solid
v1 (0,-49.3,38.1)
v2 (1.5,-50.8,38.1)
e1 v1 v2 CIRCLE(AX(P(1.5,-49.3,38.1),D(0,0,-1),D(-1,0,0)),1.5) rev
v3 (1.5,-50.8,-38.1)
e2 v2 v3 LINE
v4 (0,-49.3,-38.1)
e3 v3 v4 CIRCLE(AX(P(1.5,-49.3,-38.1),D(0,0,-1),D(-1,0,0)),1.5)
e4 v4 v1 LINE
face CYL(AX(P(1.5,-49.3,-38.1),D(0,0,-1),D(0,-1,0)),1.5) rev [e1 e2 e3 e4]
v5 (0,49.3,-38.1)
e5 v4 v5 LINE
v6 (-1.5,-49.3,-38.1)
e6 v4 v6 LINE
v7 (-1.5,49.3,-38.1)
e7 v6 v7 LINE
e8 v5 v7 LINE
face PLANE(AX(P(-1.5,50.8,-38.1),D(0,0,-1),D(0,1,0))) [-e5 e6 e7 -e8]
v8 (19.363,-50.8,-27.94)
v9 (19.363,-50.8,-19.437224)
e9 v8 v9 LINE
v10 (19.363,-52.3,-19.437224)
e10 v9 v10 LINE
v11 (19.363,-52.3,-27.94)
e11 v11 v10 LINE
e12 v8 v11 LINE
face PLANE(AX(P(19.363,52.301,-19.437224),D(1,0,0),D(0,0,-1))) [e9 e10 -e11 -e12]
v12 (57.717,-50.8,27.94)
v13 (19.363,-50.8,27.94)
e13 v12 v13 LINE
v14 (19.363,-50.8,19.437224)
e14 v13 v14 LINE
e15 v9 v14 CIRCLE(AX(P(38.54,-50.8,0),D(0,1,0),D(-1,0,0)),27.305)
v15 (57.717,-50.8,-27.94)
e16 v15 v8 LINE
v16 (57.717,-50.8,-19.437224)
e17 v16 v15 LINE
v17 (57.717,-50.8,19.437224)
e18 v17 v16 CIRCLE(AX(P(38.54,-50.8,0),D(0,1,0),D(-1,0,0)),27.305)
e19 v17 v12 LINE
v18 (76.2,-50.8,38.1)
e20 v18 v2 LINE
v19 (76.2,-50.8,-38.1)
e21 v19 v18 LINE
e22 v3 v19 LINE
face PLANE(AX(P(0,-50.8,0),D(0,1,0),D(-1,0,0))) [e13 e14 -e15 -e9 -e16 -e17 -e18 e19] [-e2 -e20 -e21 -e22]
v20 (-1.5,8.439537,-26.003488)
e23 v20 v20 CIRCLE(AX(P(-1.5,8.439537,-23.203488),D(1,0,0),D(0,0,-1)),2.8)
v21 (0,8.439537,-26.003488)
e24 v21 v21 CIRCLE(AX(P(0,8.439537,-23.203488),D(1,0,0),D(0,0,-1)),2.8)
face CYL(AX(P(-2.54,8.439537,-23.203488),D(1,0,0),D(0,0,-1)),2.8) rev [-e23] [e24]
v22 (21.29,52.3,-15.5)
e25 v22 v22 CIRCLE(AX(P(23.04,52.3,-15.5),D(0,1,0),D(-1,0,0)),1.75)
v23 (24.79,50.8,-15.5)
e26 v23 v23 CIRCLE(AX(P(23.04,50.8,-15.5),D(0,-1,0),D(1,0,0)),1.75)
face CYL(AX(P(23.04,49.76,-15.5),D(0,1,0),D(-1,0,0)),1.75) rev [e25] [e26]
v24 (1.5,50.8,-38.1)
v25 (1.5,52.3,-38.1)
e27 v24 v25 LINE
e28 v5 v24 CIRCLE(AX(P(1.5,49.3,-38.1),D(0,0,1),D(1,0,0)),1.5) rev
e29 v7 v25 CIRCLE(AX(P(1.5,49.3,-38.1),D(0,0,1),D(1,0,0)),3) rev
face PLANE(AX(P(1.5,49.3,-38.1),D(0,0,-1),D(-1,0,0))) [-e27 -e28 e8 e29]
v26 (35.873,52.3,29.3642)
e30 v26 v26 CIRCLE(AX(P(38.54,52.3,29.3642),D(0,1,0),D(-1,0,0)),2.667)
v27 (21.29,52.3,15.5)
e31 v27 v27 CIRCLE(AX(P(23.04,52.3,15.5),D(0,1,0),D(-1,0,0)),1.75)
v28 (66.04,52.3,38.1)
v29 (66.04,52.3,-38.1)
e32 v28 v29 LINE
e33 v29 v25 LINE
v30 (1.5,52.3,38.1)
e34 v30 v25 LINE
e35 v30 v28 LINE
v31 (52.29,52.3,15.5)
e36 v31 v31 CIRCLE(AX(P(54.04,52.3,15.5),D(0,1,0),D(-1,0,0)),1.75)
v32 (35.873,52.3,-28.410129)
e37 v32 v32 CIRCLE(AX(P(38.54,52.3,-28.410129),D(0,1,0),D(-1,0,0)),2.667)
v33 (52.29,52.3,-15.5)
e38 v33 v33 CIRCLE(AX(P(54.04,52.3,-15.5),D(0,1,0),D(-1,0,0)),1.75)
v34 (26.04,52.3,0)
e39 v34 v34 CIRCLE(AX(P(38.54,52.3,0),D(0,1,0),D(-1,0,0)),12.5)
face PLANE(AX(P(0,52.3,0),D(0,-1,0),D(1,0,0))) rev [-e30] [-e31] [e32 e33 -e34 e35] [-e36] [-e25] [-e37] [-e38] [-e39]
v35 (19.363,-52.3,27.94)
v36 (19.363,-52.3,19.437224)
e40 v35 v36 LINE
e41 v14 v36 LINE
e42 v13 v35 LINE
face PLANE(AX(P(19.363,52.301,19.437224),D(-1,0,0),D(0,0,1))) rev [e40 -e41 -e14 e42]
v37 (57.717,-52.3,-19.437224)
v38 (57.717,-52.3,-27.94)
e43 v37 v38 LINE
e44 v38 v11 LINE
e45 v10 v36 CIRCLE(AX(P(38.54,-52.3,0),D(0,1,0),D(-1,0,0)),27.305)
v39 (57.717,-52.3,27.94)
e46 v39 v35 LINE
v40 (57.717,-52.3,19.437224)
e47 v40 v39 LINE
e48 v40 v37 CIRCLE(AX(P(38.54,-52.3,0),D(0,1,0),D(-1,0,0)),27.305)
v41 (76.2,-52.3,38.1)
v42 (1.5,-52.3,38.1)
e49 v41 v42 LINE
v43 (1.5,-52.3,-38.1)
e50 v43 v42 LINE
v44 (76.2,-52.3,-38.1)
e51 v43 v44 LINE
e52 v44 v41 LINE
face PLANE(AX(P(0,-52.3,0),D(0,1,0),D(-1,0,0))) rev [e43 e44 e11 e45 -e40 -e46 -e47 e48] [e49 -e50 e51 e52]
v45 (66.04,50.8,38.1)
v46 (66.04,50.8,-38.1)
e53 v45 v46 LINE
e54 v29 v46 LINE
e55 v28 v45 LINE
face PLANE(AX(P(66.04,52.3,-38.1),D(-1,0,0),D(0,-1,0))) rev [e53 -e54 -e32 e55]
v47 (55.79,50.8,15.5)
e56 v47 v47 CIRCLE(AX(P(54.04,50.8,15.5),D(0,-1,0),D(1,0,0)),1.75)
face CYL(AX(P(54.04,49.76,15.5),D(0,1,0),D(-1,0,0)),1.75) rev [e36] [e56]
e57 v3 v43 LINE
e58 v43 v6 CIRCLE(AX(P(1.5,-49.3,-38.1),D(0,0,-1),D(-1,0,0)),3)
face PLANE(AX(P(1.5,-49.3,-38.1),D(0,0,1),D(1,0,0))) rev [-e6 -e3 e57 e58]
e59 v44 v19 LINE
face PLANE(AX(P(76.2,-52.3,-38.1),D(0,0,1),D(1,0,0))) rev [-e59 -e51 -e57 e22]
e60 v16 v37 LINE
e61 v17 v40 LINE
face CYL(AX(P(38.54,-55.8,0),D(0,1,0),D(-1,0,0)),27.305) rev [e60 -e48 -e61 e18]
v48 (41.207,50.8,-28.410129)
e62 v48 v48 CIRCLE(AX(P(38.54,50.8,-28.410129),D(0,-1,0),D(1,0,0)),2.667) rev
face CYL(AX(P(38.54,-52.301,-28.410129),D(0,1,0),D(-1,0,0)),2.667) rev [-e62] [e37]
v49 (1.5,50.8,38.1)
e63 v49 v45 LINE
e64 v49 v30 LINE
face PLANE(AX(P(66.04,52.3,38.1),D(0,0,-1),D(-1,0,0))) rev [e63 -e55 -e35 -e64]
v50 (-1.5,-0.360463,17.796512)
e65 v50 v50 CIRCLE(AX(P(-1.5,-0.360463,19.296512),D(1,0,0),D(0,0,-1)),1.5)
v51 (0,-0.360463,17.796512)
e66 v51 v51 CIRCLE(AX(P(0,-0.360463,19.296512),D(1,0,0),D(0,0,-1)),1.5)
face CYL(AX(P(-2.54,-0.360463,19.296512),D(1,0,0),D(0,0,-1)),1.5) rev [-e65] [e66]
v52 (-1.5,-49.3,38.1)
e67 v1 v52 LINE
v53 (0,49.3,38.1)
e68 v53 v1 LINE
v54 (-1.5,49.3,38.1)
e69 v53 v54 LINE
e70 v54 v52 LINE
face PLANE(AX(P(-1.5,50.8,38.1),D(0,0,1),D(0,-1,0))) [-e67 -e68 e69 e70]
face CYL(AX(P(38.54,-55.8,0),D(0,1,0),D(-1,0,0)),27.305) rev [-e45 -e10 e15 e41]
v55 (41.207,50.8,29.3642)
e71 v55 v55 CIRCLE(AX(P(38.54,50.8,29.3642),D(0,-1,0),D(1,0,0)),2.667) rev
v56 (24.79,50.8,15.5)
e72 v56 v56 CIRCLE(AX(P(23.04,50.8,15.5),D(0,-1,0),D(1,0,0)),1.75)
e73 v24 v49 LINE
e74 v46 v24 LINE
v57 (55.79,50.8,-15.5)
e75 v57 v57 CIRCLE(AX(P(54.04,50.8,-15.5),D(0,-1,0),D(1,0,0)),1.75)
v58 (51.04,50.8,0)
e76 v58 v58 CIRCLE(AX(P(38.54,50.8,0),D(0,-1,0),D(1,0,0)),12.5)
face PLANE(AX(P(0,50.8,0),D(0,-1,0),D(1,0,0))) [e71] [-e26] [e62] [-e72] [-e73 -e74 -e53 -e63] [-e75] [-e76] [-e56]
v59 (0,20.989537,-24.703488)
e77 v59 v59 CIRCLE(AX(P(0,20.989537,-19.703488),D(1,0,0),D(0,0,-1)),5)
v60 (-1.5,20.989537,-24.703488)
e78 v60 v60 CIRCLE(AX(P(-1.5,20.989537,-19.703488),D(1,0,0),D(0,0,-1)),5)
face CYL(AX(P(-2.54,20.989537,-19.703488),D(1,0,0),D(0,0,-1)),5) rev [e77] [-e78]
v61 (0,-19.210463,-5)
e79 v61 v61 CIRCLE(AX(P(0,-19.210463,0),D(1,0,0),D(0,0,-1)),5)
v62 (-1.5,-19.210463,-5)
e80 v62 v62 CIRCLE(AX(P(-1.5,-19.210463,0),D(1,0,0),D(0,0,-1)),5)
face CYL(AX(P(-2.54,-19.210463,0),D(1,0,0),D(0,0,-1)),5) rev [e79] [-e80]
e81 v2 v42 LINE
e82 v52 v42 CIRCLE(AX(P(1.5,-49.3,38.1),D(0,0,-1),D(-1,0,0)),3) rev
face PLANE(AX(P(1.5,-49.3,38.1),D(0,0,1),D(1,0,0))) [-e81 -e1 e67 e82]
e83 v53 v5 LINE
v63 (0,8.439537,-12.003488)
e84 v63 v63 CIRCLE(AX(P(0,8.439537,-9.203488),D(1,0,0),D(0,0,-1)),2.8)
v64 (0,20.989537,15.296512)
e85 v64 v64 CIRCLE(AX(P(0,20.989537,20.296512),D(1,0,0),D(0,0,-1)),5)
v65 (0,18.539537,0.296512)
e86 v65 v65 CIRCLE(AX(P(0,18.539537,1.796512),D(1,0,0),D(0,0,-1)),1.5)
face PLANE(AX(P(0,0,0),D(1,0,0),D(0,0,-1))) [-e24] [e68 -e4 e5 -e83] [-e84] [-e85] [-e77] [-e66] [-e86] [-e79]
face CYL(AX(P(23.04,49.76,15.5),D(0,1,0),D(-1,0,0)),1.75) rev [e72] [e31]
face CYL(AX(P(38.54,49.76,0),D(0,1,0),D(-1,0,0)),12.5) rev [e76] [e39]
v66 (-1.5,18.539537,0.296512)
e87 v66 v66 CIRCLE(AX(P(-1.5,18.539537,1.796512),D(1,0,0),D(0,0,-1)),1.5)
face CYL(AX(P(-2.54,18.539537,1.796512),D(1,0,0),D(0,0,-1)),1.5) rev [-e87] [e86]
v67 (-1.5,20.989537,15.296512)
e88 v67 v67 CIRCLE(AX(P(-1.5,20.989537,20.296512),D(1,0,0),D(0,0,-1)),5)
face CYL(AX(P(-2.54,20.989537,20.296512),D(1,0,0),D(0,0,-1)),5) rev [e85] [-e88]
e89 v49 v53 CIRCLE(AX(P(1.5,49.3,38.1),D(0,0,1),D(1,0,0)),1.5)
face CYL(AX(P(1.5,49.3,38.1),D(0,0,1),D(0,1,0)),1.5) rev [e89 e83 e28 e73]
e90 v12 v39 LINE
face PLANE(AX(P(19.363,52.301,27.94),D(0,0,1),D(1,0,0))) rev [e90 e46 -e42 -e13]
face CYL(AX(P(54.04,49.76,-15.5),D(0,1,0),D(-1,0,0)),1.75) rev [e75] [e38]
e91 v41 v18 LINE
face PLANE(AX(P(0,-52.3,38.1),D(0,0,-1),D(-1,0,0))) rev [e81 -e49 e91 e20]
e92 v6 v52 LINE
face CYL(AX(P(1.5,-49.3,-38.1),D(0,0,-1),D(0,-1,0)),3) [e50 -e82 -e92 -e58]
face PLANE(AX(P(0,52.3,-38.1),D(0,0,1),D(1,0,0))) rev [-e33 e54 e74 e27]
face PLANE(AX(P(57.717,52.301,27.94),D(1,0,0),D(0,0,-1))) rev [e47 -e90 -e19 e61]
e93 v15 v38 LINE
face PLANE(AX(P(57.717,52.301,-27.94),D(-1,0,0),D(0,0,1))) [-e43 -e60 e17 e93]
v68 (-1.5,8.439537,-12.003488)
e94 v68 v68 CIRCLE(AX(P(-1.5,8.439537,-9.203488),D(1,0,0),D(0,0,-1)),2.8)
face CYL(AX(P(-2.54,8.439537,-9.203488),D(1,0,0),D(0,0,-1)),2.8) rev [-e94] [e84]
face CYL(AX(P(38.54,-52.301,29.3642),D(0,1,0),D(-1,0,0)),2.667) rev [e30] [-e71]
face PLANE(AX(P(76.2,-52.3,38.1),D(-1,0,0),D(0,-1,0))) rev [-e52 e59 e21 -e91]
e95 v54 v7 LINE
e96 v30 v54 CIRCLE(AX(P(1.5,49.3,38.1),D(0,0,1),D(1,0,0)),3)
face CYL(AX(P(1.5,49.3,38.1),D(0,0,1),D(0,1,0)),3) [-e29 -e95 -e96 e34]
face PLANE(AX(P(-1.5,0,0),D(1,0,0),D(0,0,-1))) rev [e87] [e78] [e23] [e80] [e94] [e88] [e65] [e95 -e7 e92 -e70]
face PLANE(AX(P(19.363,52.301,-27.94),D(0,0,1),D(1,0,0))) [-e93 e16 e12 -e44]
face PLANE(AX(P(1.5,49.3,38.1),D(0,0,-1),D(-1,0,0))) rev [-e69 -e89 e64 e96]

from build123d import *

# Parameters (mm, degrees)
SKETCH63_W                     = 76.2
SKETCH63_H                     = 101.6
BRACKET_INTERFACE_DEPTH        = 1.5
SKETCH57_R                     = 2.8
SKETCH57_R_2                   = 1.5
SKETCH57_R_3                   = 5
CUT_EXTRUDE7_DEPTH             = 2.54
STEPPER_FLANGE_STRIP_W         = 9
STEPPER_FLANGE_STRIP_H         = 1.5
STEPPER_FLANGE_STRIP_CUT_DEPTH = 76.2
STEPPER_FLANGE_DEPTH           = 76.2
BARREL_FLANGE_STRIP_W          = 9
BARREL_FLANGE_STRIP_H          = 1.5
BARREL_FLANGE_STRIP_CUT_DEPTH  = 76.2
BARREL_FLANGE_DEPTH            = 76.2
SKETCH75_R                     = 1.75
SKETCH75_R_2                   = 12.5
NEMA_17_PATTERN_DEPTH          = 2.54
SKETCH82_R                     = 27.305
CUT_EXTRUDE8_DEPTH             = 5
CUT_EXTRUDE17_REACH            = 136.904
CUT_EXTRUDE18_REACH            = 136.904
SKETCH145_R                    = 2.667


# Sheet-metal steps are written as plain solids
with BuildPart() as part:
    # Sketch63 → Bracket_Interface (new body)
    with BuildSketch(Plane(origin=(0, 0, 0), x_dir=(0, 0, -1), z_dir=(1, 0, 0))):
        Rectangle(SKETCH63_W, SKETCH63_H)
    extrude(amount=-BRACKET_INTERFACE_DEPTH)

    # Sketch57 → Cut-Extrude7 (cut)
    # profile 1 of 7: a face of its own
    with BuildSketch(Plane(origin=(0, 0, 0), x_dir=(0, 0, -1), z_dir=(1, 0, 0))):
        with Locations((9.203487694, 8.439536918)):
            Circle(SKETCH57_R)
        with Locations((9.203487694, 8.439536918)):
            Circle(SKETCH57_R_2, mode=Mode.SUBTRACT)
    # profile 2 of 7: a face of its own
    with BuildSketch(Plane(origin=(0, 0, 0), x_dir=(0, 0, -1), z_dir=(1, 0, 0))):
        with Locations((23.203487694, 8.439536918)):
            Circle(SKETCH57_R)
        with Locations((23.203487694, 8.439536918)):
            Circle(SKETCH57_R_2, mode=Mode.SUBTRACT)
    # profile 3 of 7: a face of its own
    with BuildSketch(Plane(origin=(0, 0, 0), x_dir=(0, 0, -1), z_dir=(1, 0, 0))):
        with Locations((0, -19.210463082)):
            Circle(SKETCH57_R_3)
    # profile 4 of 7: a face of its own
    with BuildSketch(Plane(origin=(0, 0, 0), x_dir=(0, 0, -1), z_dir=(1, 0, 0))):
        with Locations((-19.296512306, -0.360463082)):
            Circle(SKETCH57_R_2)
    # profile 5 of 7: a face of its own
    with BuildSketch(Plane(origin=(0, 0, 0), x_dir=(0, 0, -1), z_dir=(1, 0, 0))):
        with Locations((-1.796512306, 18.539536918)):
            Circle(SKETCH57_R_2)
    # profile 6 of 7: a face of its own
    with BuildSketch(Plane(origin=(0, 0, 0), x_dir=(0, 0, -1), z_dir=(1, 0, 0))):
        with Locations((19.703487694, 20.989536918)):
            Circle(SKETCH57_R_3)
    # profile 7 of 7: a face of its own
    with BuildSketch(Plane(origin=(0, 0, 0), x_dir=(0, 0, -1), z_dir=(1, 0, 0))):
        with Locations((-20.296512306, 20.989536918)):
            Circle(SKETCH57_R_3)
    extrude(amount=-CUT_EXTRUDE7_DEPTH, mode=Mode.SUBTRACT)


with BuildPart() as body_2:
    # of the pieces the cut leaves, the one that is kept (cut_extrude7_keep)
    add(part.part.solids().sort_by_distance((0, 50.8, 38.1))[0])

    # Stepper_Flange strip (across the edge) → Stepper_Flange strip cut (cut)
    with BuildSketch(Plane(origin=(0, 50.8, -38.1), x_dir=(0, -1, 0), z_dir=(0, 0, 1))):
        with Locations((-3, -0.75)):
            Rectangle(STEPPER_FLANGE_STRIP_W, STEPPER_FLANGE_STRIP_H)
    extrude(amount=STEPPER_FLANGE_STRIP_CUT_DEPTH, mode=Mode.SUBTRACT)

    # Stepper_Flange section (across the edge) → Stepper_Flange (add)
    with BuildSketch(Plane(origin=(0, 50.8, -38.1), x_dir=(0, -1, 0), z_dir=(0, 0, 1))):
        with BuildLine():
            Line((-1.5, 1.5), (-1.5, 66.04))
            Line((-1.5, 66.04), (0, 66.04))
            Line((0, 66.04), (0, 1.5))
            ThreePointArc((0, 1.5), (0.439339828, 0.439339828), (1.5, 0))
            Line((1.5, 0), (1.5, -1.5))
            ThreePointArc((1.5, -1.5), (-0.621320344, -0.621320344), (-1.5, 1.5))
        make_face()
    extrude(amount=STEPPER_FLANGE_DEPTH)

    # Barrel_Flange strip (across the edge) → Barrel_Flange strip cut (cut)
    with BuildSketch(Plane(origin=(0, -50.8, 38.1), x_dir=(0, 1, 0), z_dir=(0, 0, -1))):
        with Locations((-3, -0.75)):
            Rectangle(BARREL_FLANGE_STRIP_W, BARREL_FLANGE_STRIP_H)
    extrude(amount=BARREL_FLANGE_STRIP_CUT_DEPTH, mode=Mode.SUBTRACT)

    # Barrel_Flange section (across the edge) → Barrel_Flange (add)
    with BuildSketch(Plane(origin=(0, -50.8, 38.1), x_dir=(0, 1, 0), z_dir=(0, 0, -1))):
        with BuildLine():
            Line((-1.5, 1.5), (-1.5, 76.2))
            Line((-1.5, 76.2), (0, 76.2))
            Line((0, 76.2), (0, 1.5))
            ThreePointArc((0, 1.5), (0.439339828, 0.439339828), (1.5, 0))
            Line((1.5, 0), (1.5, -1.5))
            ThreePointArc((1.5, -1.5), (-0.621320344, -0.621320344), (-1.5, 1.5))
        make_face()
    extrude(amount=BARREL_FLANGE_DEPTH)

    # Sketch75 → NEMA_17_Pattern (cut)
    with BuildSketch(Plane(origin=(0, 52.3, 0), x_dir=(1, 0, 0), z_dir=(0, 1, 0))):
        with Locations(Location((23.04, 15.5, 0), (0, 0, 180))):
            Circle(SKETCH75_R)
        with Locations(Location((54.04, 15.5, 0), (0, 0, 180))):
            Circle(SKETCH75_R)
        with Locations(Location((54.04, -15.5, 0), (0, 0, 180))):
            Circle(SKETCH75_R)
        with Locations(Location((23.04, -15.5, 0), (0, 0, 180))):
            Circle(SKETCH75_R)
        with Locations(Location((38.54, 0, 0), (0, 0, 180))):
            Circle(SKETCH75_R_2)
    extrude(amount=-NEMA_17_PATTERN_DEPTH, mode=Mode.SUBTRACT)

    # Sketch82 → Cut-Extrude8 (cut)
    with BuildSketch(Plane(origin=(0, -50.8, 0), x_dir=(1, 0, 0), z_dir=(0, 1, 0))):
        with Locations(Location((38.54, 0, 0), (0, 0, 180))):
            Circle(SKETCH82_R)
    extrude(amount=-CUT_EXTRUDE8_DEPTH, mode=Mode.SUBTRACT)

    # Sketch142 → Cut-Extrude17 (cut, up to next)
    with BuildSketch(Plane.XZ.offset(52.3), mode=Mode.PRIVATE) as cut_extrude17_sk1:
        with BuildLine():
            Line((19.363, 19.437224493), (19.363, 27.94))
            Line((19.363, 27.94), (57.717, 27.94))
            Line((57.717, 27.94), (57.717, 19.437224493))
            ThreePointArc((57.717, 19.437224493), (38.54, 27.305), (19.363, 19.437224493))
        make_face()
    cut_extrude17_tool1 = extrude(cut_extrude17_sk1.sketch, amount=-CUT_EXTRUDE17_REACH, mode=Mode.PRIVATE) & body_2.part
    cut_extrude17 = cut_extrude17_tool1.solids().sort_by_distance((38.54, -52.3, 27.697852))[0]
    add(cut_extrude17, mode=Mode.SUBTRACT)

    # Mirror1: Cut-Extrude17 across plane
    add(cut_extrude17.mirror(Plane.XY), mode=Mode.SUBTRACT)

    # Sketch145 → Cut-Extrude18 (cut, up to next)
    with BuildSketch(Plane(origin=(0, 52.3, 0), x_dir=(1, 0, 0), z_dir=(0, 1, 0)), mode=Mode.PRIVATE) as cut_extrude18_sk1:
        with Locations(Location((38.54, 28.410128662, 0), (0, 0, 180))):
            Circle(SKETCH145_R)
    cut_extrude18_tool1 = extrude(cut_extrude18_sk1.sketch, amount=-CUT_EXTRUDE18_REACH, mode=Mode.PRIVATE) & body_2.part
    # Sketch145 → Cut-Extrude18 (cut, up to next)
    with BuildSketch(Plane(origin=(0, 52.3, 0), x_dir=(1, 0, 0), z_dir=(0, 1, 0)), mode=Mode.PRIVATE) as cut_extrude18_sk2:
        with Locations(Location((38.54, -29.364200147, 0), (0, 0, 180))):
            Circle(SKETCH145_R)
    cut_extrude18_tool2 = extrude(cut_extrude18_sk2.sketch, amount=-CUT_EXTRUDE18_REACH, mode=Mode.PRIVATE) & body_2.part
    add(cut_extrude18_tool1.solids().sort_by_distance((38.54, 52.3, -28.410129))[0], mode=Mode.SUBTRACT)
    add(cut_extrude18_tool2.solids().sort_by_distance((38.54, 52.3, 29.3642))[0], mode=Mode.SUBTRACT)


solid = body_2.part
